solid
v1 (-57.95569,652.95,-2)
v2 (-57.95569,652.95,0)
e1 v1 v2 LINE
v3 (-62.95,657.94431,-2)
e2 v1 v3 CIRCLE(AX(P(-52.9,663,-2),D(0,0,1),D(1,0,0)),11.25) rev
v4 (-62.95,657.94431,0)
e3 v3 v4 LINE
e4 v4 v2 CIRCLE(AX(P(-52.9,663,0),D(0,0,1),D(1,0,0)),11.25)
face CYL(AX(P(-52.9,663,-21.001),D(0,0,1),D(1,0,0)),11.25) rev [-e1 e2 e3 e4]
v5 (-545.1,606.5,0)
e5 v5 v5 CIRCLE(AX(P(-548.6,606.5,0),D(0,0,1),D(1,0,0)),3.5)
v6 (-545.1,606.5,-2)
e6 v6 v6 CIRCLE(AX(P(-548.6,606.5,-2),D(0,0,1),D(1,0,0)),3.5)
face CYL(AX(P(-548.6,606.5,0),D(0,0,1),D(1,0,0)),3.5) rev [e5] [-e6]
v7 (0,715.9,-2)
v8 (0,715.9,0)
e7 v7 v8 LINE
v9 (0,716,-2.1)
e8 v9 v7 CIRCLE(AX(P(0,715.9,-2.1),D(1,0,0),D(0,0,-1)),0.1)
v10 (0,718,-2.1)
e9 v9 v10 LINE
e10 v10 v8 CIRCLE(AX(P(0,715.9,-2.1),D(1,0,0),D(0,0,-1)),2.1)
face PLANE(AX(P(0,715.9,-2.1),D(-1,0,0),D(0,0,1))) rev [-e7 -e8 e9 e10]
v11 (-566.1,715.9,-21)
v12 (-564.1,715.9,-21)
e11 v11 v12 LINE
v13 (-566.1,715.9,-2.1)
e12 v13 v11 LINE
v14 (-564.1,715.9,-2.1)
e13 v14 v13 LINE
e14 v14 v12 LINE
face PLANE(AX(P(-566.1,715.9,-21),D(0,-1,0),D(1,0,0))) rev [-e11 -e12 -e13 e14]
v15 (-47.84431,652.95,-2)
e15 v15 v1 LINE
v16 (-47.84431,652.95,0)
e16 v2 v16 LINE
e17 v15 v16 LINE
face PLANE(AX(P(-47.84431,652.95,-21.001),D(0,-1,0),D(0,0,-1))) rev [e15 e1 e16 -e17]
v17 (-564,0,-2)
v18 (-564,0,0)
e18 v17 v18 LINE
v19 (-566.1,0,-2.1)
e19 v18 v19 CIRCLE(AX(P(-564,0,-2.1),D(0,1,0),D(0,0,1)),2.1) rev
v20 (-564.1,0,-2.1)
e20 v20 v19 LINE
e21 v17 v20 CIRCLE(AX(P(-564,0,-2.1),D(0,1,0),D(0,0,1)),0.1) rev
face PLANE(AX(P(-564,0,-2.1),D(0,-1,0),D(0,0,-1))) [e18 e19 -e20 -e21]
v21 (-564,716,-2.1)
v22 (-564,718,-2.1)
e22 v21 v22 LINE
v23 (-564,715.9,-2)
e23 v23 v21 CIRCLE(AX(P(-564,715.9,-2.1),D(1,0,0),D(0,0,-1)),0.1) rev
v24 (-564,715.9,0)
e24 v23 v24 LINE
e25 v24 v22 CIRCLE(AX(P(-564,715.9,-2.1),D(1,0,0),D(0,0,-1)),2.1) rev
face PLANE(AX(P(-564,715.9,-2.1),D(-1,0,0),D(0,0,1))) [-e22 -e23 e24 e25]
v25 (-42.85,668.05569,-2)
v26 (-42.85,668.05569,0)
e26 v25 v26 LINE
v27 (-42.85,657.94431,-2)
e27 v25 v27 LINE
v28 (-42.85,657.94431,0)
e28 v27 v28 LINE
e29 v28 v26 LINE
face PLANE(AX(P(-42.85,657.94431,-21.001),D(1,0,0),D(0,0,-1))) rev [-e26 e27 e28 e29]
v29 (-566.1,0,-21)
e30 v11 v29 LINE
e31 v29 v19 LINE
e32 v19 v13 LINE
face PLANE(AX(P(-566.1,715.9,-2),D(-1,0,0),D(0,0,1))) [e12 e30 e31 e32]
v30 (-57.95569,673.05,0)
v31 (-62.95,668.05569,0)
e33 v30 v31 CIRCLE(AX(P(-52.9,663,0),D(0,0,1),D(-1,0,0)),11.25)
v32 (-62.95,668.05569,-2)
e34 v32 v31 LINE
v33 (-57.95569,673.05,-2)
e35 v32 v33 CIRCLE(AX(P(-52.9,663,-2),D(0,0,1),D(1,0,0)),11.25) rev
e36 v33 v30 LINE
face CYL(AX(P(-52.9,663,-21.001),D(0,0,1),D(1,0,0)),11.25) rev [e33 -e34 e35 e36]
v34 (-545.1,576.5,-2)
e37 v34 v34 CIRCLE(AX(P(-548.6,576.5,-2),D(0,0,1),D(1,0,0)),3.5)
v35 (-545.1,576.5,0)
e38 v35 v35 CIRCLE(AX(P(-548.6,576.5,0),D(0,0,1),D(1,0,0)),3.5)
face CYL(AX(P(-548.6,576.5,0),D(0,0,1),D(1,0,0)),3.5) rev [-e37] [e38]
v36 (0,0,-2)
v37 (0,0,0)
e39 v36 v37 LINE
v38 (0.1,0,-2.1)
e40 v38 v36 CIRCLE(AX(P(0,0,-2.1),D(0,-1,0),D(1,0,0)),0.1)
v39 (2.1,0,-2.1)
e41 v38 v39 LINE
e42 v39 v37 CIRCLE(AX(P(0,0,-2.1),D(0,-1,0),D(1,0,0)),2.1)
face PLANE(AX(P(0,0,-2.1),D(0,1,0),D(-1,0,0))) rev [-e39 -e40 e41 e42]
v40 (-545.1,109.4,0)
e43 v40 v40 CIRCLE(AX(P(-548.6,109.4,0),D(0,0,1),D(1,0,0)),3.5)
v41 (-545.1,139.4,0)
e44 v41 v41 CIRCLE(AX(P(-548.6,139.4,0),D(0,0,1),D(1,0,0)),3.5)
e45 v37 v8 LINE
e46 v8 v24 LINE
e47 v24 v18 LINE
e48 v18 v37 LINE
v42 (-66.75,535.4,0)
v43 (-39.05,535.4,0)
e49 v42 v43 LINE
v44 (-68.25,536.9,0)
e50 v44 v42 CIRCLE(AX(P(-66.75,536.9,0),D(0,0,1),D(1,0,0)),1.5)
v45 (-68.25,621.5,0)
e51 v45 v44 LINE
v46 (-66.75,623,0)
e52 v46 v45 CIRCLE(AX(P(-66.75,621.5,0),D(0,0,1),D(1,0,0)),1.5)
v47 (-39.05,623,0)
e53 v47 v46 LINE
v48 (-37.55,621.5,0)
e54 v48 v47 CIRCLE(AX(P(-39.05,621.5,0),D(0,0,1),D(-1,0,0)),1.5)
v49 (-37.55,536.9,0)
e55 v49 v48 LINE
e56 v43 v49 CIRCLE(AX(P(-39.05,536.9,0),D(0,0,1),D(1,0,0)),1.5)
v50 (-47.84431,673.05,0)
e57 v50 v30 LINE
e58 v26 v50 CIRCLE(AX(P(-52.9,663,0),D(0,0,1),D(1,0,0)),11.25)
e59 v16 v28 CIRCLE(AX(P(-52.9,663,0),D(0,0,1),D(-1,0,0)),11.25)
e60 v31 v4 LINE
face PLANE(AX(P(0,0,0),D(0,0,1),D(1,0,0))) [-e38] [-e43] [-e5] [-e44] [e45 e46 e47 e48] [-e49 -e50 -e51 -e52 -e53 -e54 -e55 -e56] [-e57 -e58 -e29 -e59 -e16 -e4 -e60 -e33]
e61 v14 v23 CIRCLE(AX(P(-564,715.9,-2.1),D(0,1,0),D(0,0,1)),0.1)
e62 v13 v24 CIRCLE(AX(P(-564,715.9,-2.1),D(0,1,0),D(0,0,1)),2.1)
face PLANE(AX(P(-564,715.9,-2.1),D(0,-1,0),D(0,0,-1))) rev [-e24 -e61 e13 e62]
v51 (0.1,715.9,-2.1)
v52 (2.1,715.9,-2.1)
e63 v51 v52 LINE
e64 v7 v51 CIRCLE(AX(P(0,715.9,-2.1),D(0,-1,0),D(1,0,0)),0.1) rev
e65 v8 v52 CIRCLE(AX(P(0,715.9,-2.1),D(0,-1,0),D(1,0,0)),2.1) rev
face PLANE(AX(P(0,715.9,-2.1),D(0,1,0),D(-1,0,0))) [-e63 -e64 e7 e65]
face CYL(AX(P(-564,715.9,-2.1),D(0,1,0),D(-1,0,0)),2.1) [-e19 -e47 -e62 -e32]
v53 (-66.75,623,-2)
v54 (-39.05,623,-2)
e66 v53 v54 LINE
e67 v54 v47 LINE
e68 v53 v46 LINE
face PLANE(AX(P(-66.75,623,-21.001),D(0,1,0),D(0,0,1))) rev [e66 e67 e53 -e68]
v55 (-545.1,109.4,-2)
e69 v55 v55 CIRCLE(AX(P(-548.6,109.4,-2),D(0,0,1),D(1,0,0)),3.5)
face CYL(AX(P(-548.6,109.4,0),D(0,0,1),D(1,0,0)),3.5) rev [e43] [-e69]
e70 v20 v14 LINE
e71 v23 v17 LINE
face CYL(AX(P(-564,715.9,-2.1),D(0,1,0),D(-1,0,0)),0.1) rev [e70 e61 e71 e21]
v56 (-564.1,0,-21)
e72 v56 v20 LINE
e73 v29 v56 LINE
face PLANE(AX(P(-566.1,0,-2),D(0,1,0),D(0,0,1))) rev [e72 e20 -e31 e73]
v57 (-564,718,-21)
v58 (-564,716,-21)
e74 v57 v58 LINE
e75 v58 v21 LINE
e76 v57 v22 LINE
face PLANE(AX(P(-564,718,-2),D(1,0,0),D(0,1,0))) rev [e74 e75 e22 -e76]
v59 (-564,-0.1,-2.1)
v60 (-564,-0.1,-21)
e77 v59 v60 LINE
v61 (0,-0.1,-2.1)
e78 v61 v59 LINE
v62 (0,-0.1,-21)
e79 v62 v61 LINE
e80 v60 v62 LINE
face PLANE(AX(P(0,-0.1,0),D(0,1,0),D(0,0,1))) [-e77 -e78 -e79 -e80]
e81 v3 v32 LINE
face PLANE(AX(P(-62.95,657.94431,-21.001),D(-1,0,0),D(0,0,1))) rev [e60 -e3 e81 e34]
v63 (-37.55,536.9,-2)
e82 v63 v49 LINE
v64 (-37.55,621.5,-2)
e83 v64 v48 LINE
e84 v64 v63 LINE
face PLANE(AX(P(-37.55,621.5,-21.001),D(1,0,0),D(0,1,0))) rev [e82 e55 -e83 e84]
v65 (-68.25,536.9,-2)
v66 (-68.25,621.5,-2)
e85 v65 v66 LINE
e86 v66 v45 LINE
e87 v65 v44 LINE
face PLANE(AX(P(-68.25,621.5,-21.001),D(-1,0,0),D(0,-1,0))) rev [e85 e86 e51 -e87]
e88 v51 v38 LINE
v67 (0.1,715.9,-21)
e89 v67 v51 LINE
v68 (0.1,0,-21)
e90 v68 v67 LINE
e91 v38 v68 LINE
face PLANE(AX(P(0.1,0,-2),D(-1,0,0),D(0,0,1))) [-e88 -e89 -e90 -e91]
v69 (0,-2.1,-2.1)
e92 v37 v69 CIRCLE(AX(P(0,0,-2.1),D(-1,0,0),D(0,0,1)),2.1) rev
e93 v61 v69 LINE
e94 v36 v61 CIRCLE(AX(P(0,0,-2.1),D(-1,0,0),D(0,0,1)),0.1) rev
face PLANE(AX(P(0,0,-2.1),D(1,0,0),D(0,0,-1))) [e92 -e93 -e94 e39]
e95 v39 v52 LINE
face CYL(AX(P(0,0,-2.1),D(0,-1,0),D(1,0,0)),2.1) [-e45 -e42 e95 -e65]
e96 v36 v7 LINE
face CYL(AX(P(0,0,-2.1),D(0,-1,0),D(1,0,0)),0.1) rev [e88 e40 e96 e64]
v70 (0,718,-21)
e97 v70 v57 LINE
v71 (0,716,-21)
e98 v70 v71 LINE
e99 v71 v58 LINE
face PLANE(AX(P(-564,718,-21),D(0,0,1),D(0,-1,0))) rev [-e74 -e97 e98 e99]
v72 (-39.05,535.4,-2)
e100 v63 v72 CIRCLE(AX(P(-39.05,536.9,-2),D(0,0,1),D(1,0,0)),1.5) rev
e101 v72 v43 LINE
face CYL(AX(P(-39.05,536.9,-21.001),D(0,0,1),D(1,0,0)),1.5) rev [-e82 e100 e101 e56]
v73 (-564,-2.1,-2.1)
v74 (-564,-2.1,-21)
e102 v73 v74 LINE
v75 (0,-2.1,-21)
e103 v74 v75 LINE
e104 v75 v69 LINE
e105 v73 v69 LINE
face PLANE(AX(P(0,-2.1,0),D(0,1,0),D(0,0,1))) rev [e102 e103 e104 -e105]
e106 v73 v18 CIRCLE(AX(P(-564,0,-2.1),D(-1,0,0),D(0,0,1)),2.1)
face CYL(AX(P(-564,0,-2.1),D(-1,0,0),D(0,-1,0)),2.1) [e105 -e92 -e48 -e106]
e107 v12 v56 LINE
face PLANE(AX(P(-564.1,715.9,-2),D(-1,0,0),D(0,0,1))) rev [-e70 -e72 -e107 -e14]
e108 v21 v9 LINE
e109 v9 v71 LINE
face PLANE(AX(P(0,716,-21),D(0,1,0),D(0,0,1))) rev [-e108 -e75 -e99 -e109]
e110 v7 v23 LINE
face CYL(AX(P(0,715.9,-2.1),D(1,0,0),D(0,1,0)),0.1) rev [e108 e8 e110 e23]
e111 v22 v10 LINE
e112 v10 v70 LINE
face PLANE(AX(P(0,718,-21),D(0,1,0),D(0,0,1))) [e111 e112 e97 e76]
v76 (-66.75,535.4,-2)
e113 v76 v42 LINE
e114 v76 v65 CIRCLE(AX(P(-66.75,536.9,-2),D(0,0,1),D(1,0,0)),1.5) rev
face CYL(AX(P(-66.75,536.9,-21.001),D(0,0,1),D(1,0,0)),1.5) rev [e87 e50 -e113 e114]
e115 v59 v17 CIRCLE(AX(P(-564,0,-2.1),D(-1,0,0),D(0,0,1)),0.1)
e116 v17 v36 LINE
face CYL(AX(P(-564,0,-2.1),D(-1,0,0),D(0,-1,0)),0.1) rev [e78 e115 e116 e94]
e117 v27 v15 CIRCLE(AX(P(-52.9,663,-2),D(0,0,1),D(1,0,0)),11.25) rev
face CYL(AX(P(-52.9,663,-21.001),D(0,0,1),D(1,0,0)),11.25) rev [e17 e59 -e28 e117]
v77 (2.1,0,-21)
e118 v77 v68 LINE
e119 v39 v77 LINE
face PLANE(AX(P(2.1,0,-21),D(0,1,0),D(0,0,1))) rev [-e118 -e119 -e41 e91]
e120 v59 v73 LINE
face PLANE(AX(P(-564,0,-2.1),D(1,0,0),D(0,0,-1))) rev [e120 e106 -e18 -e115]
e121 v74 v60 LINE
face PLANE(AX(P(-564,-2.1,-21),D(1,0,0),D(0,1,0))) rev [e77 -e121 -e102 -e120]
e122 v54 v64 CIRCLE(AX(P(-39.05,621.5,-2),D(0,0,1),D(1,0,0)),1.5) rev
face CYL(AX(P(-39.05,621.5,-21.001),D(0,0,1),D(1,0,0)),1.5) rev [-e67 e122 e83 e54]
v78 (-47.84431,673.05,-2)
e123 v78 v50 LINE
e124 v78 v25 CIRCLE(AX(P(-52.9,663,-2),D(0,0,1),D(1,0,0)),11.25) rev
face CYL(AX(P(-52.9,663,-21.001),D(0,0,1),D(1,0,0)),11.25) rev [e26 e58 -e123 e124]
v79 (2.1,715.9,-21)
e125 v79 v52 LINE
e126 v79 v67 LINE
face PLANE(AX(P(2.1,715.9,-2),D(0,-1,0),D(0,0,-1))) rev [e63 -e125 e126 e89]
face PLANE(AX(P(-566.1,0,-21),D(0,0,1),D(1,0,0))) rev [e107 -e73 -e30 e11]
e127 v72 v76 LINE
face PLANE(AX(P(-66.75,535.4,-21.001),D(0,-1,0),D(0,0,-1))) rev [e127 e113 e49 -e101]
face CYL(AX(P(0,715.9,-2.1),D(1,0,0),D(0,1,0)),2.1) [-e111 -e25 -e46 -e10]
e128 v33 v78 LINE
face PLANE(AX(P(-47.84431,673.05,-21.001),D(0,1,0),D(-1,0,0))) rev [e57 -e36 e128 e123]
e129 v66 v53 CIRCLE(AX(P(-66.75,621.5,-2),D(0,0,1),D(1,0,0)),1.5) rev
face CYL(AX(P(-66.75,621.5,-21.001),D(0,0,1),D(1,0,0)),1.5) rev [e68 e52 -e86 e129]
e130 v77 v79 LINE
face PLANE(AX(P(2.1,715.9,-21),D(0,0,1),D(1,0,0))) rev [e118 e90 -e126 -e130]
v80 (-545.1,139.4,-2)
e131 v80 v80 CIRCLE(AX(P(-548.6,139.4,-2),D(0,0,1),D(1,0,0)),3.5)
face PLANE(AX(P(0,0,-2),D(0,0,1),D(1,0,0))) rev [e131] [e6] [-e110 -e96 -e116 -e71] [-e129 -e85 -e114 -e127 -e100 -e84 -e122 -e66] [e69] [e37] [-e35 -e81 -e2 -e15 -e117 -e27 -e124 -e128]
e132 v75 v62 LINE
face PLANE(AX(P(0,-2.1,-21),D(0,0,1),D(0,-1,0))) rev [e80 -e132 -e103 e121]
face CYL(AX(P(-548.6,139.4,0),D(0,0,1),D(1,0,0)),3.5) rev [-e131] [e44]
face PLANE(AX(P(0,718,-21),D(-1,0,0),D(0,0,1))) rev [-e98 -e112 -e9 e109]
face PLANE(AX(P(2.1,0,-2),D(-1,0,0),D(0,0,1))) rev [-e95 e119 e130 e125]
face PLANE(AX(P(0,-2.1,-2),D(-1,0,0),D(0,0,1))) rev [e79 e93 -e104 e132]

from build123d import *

# Parameters (mm, degrees)
SKIZZE1_W                          = 564
SKIZZE1_H                          = 715.9
BASIS_BLECH_DEPTH                  = 2
KANTE_LASCHE1_DEPTH                = 715.9
KANTE_LASCHE2_DEPTH                = 564
KANTE_LASCHE3_DEPTH                = 715.9
KANTE_LASCHE4_DEPTH                = 564
SCHNITT_LINEAR_AUSTRAGEN1_REACH    = 916.568
F_7_0_7_DURCHMESSER_BOHRUNG1_D     = 7
F_7_0_7_DURCHMESSER_BOHRUNG1_DEPTH = 20
F_7_0_7_DURCHMESSER_BOHRUNG1_TIP   = 2.103012167


# Sheet-metal steps are written as plain solids
with BuildPart() as part:
    # Skizze1 → Basis-Blech (new body)
    with BuildSketch(Plane.XY):
        with Locations((-282, 357.95)):
            Rectangle(SKIZZE1_W, SKIZZE1_H)
    extrude(amount=-BASIS_BLECH_DEPTH)

    # Kante-Lasche1 section (across the edge) → Kante-Lasche1 (add)
    with BuildSketch(Plane(origin=(0.1, 715.9, -2), x_dir=(-1, 0, 0), z_dir=(0, -1, 0))):
        with BuildLine():
            Line((-2, 0.1), (-2, 19))
            Line((-2, 19), (0, 19))
            Line((0, 19), (0, 0.1))
            ThreePointArc((0, 0.1), (0.029289322, 0.029289322), (0.1, 0))
            Line((0.1, 0), (0.1, -2))
            ThreePointArc((0.1, -2), (-1.38492424, -1.38492424), (-2, 0.1))
        make_face()
    extrude(amount=KANTE_LASCHE1_DEPTH)

    # Kante-Lasche2 section (across the edge) → Kante-Lasche2 (add)
    with BuildSketch(Plane(origin=(-564, 716, -2), x_dir=(0, -1, 0), z_dir=(1, 0, 0))):
        with BuildLine():
            Line((-2, 0.1), (-2, 19))
            Line((-2, 19), (0, 19))
            Line((0, 19), (0, 0.1))
            ThreePointArc((0, 0.1), (0.029289322, 0.029289322), (0.1, 0))
            Line((0.1, 0), (0.1, -2))
            ThreePointArc((0.1, -2), (-1.38492424, -1.38492424), (-2, 0.1))
        make_face()
    extrude(amount=KANTE_LASCHE2_DEPTH)

    # Kante-Lasche3 section (across the edge) → Kante-Lasche3 (add)
    with BuildSketch(Plane(origin=(-564.1, 0, -2), x_dir=(1, 0, 0), z_dir=(0, 1, 0))):
        with BuildLine():
            Line((-2, 0.1), (-2, 19))
            Line((-2, 19), (0, 19))
            Line((0, 19), (0, 0.1))
            ThreePointArc((0, 0.1), (0.029289322, 0.029289322), (0.1, 0))
            Line((0.1, 0), (0.1, -2))
            ThreePointArc((0.1, -2), (-1.38492424, -1.38492424), (-2, 0.1))
        make_face()
    extrude(amount=KANTE_LASCHE3_DEPTH)

    # Kante-Lasche4 section (across the edge) → Kante-Lasche4 (add)
    with BuildSketch(Plane(origin=(0, -0.1, -2), x_dir=(0, 1, 0), z_dir=(-1, 0, 0))):
        with BuildLine():
            Line((-2, 0.1), (-2, 19))
            Line((-2, 19), (0, 19))
            Line((0, 19), (0, 0.1))
            ThreePointArc((0, 0.1), (0.029289322, 0.029289322), (0.1, 0))
            Line((0.1, 0), (0.1, -2))
            ThreePointArc((0.1, -2), (-1.38492424, -1.38492424), (-2, 0.1))
        make_face()
    extrude(amount=KANTE_LASCHE4_DEPTH)

    # Skizze17 → Schnitt-Linear austragen1 (cut, up to next)
    with BuildSketch(Plane.XY, mode=Mode.PRIVATE) as schnitt_linear_austragen1_sk1:
        with BuildLine():
            Line((-62.95, 657.944310136), (-62.95, 668.055689864))
            ThreePointArc((-62.95, 668.055689864), (-60.854951288, 670.954951288), (-57.955689864, 673.05))
            Line((-57.955689864, 673.05), (-47.844310136, 673.05))
            ThreePointArc((-47.844310136, 673.05), (-44.945048712, 670.954951288), (-42.85, 668.055689864))
            Line((-42.85, 668.055689864), (-42.85, 657.944310136))
            ThreePointArc((-42.85, 657.944310136), (-44.945048712, 655.045048712), (-47.844310136, 652.95))
            Line((-47.844310136, 652.95), (-57.955689864, 652.95))
            ThreePointArc((-57.955689864, 652.95), (-60.854951288, 655.045048712), (-62.95, 657.944310136))
        make_face()
    schnitt_linear_austragen1_tool1 = extrude(schnitt_linear_austragen1_sk1.sketch, amount=-SCHNITT_LINEAR_AUSTRAGEN1_REACH, mode=Mode.PRIVATE) & part.part
    # Skizze17 → Schnitt-Linear austragen1 (cut, up to next)
    with BuildSketch(Plane.XY, mode=Mode.PRIVATE) as schnitt_linear_austragen1_sk2:
        with BuildLine():
            Line((-66.75, 623), (-39.05, 623))
            ThreePointArc((-39.05, 623), (-37.989339828, 622.560660172), (-37.55, 621.5))
            Line((-37.55, 621.5), (-37.55, 536.9))
            ThreePointArc((-37.55, 536.9), (-37.989339828, 535.839339828), (-39.05, 535.4))
            Line((-39.05, 535.4), (-66.75, 535.4))
            ThreePointArc((-66.75, 535.4), (-67.810660172, 535.839339828), (-68.25, 536.9))
            Line((-68.25, 536.9), (-68.25, 621.5))
            ThreePointArc((-68.25, 621.5), (-67.810660172, 622.560660172), (-66.75, 623))
        make_face()
    schnitt_linear_austragen1_tool2 = extrude(schnitt_linear_austragen1_sk2.sketch, amount=-SCHNITT_LINEAR_AUSTRAGEN1_REACH, mode=Mode.PRIVATE) & part.part
    add(schnitt_linear_austragen1_tool1.solids().sort_by_distance((-52.9, 663, 0))[0], mode=Mode.SUBTRACT)
    add(schnitt_linear_austragen1_tool2.solids().sort_by_distance((-52.9, 579.2, 0))[0], mode=Mode.SUBTRACT)

    # Ø7.0 (7) Durchmesser Bohrung1
    with Locations(Plane.XY):
        with Locations((-548.6, 109.4), (-548.6, 139.4), (-548.6, 576.5), (-548.6, 606.5)):
            Hole(F_7_0_7_DURCHMESSER_BOHRUNG1_D / 2, depth=F_7_0_7_DURCHMESSER_BOHRUNG1_DEPTH)
            with Locations((0, 0, -(F_7_0_7_DURCHMESSER_BOHRUNG1_DEPTH + F_7_0_7_DURCHMESSER_BOHRUNG1_TIP / 2))):  # 118° drill point
                Cone(0, F_7_0_7_DURCHMESSER_BOHRUNG1_D / 2, F_7_0_7_DURCHMESSER_BOHRUNG1_TIP, mode=Mode.SUBTRACT)


solid = part.part
